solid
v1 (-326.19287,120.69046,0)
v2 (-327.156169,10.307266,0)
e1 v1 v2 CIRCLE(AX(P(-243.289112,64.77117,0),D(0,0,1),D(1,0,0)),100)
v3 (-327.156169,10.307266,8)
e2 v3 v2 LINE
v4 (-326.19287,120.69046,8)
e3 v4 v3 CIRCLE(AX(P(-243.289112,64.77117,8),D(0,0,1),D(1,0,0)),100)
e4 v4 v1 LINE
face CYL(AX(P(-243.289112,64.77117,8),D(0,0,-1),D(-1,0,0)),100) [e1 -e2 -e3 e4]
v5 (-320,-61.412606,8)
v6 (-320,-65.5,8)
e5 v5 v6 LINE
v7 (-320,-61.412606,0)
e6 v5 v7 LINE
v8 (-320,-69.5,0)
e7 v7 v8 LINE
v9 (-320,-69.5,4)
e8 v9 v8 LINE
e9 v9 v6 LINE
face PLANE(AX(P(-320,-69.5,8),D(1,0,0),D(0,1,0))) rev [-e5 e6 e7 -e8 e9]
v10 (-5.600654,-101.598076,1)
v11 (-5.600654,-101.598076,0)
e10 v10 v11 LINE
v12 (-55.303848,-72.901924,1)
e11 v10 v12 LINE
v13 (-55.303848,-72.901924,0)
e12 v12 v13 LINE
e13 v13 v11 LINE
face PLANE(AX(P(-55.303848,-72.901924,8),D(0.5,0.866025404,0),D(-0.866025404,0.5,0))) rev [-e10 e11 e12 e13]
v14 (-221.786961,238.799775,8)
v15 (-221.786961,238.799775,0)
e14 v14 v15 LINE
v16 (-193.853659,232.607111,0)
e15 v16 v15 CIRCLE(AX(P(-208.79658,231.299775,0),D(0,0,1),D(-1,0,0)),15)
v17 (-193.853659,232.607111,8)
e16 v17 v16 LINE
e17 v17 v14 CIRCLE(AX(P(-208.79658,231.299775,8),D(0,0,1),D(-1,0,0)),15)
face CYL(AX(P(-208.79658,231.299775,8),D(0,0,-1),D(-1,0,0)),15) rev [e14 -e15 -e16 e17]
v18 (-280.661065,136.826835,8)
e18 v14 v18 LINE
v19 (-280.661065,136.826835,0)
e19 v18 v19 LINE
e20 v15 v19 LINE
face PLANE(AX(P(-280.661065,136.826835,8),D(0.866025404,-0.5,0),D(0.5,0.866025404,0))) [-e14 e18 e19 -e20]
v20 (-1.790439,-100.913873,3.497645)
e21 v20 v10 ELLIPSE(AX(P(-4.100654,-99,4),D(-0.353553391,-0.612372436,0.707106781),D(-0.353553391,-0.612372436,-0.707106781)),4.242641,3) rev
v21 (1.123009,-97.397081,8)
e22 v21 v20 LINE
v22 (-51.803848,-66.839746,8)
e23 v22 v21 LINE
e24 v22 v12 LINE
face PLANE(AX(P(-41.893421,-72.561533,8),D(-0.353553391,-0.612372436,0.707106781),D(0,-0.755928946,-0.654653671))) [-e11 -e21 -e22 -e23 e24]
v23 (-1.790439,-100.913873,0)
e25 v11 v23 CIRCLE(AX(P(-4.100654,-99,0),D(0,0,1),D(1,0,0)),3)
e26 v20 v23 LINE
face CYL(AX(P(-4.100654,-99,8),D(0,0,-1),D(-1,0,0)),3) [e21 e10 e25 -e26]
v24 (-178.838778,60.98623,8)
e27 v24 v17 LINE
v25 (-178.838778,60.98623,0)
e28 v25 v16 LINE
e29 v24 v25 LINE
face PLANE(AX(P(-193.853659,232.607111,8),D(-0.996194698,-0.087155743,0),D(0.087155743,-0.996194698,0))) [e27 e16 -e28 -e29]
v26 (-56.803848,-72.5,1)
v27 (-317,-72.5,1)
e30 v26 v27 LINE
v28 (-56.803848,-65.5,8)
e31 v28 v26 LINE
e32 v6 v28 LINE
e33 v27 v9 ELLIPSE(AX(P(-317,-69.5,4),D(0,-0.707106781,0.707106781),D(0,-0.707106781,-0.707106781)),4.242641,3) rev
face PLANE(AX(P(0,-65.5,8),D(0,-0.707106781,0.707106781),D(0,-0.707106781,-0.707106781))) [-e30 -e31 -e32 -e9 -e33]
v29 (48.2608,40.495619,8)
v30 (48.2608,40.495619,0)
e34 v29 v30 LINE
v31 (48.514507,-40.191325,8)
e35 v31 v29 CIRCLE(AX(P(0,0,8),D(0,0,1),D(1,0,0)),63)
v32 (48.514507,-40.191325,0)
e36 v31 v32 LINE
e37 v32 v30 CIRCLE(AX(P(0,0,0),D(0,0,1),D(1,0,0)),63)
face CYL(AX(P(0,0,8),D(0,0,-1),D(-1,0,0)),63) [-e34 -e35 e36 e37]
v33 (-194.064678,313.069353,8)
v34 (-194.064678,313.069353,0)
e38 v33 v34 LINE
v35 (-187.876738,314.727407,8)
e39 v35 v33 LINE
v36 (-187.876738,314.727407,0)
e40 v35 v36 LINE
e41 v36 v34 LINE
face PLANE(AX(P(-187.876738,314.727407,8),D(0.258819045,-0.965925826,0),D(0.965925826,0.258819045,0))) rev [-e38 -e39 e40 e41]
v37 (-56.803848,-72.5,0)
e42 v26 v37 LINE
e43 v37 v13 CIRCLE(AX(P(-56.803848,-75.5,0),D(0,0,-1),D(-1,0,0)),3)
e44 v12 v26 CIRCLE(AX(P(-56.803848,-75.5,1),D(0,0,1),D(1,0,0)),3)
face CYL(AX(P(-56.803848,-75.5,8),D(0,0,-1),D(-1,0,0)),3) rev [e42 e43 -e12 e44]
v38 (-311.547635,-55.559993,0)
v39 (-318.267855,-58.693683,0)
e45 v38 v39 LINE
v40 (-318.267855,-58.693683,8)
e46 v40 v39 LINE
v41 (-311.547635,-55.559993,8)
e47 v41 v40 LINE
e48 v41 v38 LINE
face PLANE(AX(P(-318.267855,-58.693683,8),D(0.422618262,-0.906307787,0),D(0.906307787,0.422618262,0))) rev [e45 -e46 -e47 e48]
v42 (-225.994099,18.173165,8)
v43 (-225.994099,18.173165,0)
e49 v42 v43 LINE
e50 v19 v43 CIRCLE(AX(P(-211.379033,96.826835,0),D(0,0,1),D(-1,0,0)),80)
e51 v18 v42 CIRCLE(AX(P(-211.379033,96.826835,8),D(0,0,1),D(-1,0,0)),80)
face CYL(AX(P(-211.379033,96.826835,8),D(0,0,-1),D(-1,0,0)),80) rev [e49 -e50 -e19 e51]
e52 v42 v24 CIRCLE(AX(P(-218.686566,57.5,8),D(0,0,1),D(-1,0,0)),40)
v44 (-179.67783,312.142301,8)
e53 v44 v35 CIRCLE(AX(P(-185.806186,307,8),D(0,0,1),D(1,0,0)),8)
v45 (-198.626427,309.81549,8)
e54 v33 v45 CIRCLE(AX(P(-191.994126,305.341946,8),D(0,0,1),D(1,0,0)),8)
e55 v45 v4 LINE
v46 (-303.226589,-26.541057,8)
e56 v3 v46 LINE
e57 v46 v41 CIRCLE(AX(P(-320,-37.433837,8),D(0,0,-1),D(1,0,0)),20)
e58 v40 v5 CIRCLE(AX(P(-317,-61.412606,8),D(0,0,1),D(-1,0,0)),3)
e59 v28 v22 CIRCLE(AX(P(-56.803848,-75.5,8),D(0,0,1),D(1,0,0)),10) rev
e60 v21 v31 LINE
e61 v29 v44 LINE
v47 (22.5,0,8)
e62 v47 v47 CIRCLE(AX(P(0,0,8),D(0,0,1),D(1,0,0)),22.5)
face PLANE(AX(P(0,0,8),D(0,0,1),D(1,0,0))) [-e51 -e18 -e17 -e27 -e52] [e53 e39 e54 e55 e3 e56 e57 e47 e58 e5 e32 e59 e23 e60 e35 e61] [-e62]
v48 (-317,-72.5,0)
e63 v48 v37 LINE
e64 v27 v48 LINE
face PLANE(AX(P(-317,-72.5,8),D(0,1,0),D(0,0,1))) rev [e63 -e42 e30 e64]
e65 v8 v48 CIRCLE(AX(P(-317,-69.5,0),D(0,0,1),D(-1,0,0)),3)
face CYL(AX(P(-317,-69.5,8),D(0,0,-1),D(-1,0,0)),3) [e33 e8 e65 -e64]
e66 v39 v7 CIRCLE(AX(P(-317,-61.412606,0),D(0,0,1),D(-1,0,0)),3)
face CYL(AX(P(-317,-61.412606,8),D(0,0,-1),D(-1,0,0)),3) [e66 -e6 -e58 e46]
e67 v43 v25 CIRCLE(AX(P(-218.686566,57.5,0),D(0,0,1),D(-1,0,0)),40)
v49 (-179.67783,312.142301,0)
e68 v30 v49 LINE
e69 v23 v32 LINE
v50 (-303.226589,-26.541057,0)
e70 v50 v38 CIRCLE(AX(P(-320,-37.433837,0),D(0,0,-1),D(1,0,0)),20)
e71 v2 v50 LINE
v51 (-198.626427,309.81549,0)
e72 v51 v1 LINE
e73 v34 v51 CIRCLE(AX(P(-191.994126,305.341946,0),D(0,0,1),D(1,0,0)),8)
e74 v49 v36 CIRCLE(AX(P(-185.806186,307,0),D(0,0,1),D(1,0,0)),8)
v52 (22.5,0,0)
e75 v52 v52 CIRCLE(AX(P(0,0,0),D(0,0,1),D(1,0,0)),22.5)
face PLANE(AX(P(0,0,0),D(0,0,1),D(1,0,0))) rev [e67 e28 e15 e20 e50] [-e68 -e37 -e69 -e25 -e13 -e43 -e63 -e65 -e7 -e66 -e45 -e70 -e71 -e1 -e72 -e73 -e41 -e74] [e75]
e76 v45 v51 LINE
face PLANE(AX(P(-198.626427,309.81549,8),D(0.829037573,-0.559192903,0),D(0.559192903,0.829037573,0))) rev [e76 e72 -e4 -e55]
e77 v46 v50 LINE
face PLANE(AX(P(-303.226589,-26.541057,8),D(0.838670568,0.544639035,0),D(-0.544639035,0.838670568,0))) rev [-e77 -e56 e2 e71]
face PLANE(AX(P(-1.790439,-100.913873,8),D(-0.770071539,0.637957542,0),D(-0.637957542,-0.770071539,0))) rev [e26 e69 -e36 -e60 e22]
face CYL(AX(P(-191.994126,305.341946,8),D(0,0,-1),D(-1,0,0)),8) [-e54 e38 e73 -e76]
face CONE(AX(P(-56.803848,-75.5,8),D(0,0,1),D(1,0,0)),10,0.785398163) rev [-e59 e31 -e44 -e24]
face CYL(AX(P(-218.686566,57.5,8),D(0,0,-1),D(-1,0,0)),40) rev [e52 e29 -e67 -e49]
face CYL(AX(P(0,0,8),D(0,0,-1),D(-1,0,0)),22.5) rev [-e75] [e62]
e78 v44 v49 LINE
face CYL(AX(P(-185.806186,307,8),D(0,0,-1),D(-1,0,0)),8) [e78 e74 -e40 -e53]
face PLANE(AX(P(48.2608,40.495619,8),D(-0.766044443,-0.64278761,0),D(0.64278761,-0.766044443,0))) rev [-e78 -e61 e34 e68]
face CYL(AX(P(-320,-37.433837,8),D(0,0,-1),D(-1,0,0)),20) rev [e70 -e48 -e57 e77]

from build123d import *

# Parameters (mm, degrees)
SKETCH1_R                          = 22.5
EXTRUDE1_DEPTH                     = 8
F_7_X_45_GR_SK_RPNING_VENSTRE_SIZE = 7


with BuildPart() as part:
    # Sketch1 → Extrude1 (new body)
    with BuildSketch(Plane.XY):
        with BuildLine():
            Line((-317, -72.5), (-56.803847577, -72.5))
            ThreePointArc((-56.803847577, -72.5), (-56.027390442, -72.602222521), (-55.303847577, -72.901923789))
            Line((-55.303847577, -72.901923789), (-5.600653599, -101.598076211))
            ThreePointArc((-5.600653599, -101.598076211), (-3.570421982, -101.952770637), (-1.790438983, -100.913872625))
            Line((-1.790438983, -100.913872625), (48.51450695, -40.191325127))
            ThreePointArc((48.51450695, -40.191325127), (62.999688566, 0.19809232), (48.260799916, 40.49561941))
            Line((48.260799916, 40.49561941), (-179.677830313, 312.142300877))
            ThreePointArc((-179.677830313, 312.142300877), (-183.400539462, 314.629735606), (-187.876738219, 314.72740661))
            Line((-187.876738219, 314.72740661), (-194.064678331, 313.069353055))
            ThreePointArc((-194.064678331, 313.069353055), (-196.639749615, 311.854870591), (-198.62642655, 309.815489672))
            Line((-198.62642655, 309.815489672), (-326.192869732, 120.690460119))
            ThreePointArc((-326.192869732, 120.690460119), (-343.285304783, 65.643823322), (-327.156169271, 10.30726627))
            Line((-327.156169271, 10.30726627), (-303.226588641, -26.54105654))
            ThreePointArc((-303.226588641, -26.54105654), (-300.774766081, -42.946584357), (-311.547634765, -55.559992981))
            Line((-311.547634765, -55.559992981), (-318.267854785, -58.693683041))
            ThreePointArc((-318.267854785, -58.693683041), (-319.530174337, -59.800707577), (-320, -61.412606402))
            Line((-320, -61.412606402), (-320, -69.5))
            ThreePointArc((-320, -69.5), (-319.121320344, -71.621320344), (-317, -72.5))
        make_face()
        Circle(SKETCH1_R, mode=Mode.SUBTRACT)
        with BuildLine():
            Line((-193.85365949, 232.607111101), (-178.838777944, 60.98622971))
            ThreePointArc((-178.838777944, 60.98622971), (-191.798712106, 27.885082811), (-225.99409877, 18.173164851))
            ThreePointArc((-225.99409877, 18.173164851), (-284.038197126, 63.350786049), (-280.661065267, 136.826835149))
            Line((-280.661065267, 136.826835149), (-221.786961018, 238.79977496))
            ThreePointArc((-221.786961018, 238.79977496), (-205.549985752, 245.944215066), (-193.85365949, 232.607111101))
        make_face(mode=Mode.SUBTRACT)
    extrude(amount=EXTRUDE1_DEPTH)

    # 7 x 45 gr skærpning - Venstre
    # the kernel refuses this chamfer: 7 mm, written as the material it takes off along each edge
    with BuildSketch(Plane(origin=(-55.303847577, -72.901923789, 8), x_dir=(-0.013747938305292761, -0.02381212764408935, -0.9996219169112969), z_dir=(0.8660254037844379, -0.5000000000000012, 0))) as f_7_x_45_gr_sk_rpning_venstre_piece_1:
        Polygon((F_7_X_45_GR_SK_RPNING_VENSTRE_SIZE * 0.999621916911, F_7_X_45_GR_SK_RPNING_VENSTRE_SIZE * 0.0274958766106), (-F_7_X_45_GR_SK_RPNING_VENSTRE_SIZE * 0.0274958766106, F_7_X_45_GR_SK_RPNING_VENSTRE_SIZE * 0.999621916911), (0, 0), align=None)
    extrude(amount=75.394085761, mode=Mode.SUBTRACT)
    with BuildSketch(Plane(origin=(-56.803847577, -75.5, 8), x_dir=(0, 1, 0), z_dir=(-1, 0, 0))) as f_7_x_45_gr_sk_rpning_venstre_piece_2:
        Polygon((3, F_7_X_45_GR_SK_RPNING_VENSTRE_SIZE), (3 + F_7_X_45_GR_SK_RPNING_VENSTRE_SIZE, 0), (3, 0), align=None)
    revolve(axis=Axis((-56.803847577, -75.5, 8), (0, 0, -1)), revolution_arc=30, mode=Mode.SUBTRACT)
    with BuildSketch(Plane(origin=(-335.001780916, -72.5, 8), x_dir=(0, -0.02749587661058612, -0.9996219169112968), z_dir=(1, 0, 0))) as f_7_x_45_gr_sk_rpning_venstre_piece_3:
        Polygon((F_7_X_45_GR_SK_RPNING_VENSTRE_SIZE * 0.999621916911, F_7_X_45_GR_SK_RPNING_VENSTRE_SIZE * 0.0274958766106), (-F_7_X_45_GR_SK_RPNING_VENSTRE_SIZE * 0.0274958766106, F_7_X_45_GR_SK_RPNING_VENSTRE_SIZE * 0.999621916911), (0, 0), align=None)
    extrude(amount=278.197933338, mode=Mode.SUBTRACT)


solid = part.part
